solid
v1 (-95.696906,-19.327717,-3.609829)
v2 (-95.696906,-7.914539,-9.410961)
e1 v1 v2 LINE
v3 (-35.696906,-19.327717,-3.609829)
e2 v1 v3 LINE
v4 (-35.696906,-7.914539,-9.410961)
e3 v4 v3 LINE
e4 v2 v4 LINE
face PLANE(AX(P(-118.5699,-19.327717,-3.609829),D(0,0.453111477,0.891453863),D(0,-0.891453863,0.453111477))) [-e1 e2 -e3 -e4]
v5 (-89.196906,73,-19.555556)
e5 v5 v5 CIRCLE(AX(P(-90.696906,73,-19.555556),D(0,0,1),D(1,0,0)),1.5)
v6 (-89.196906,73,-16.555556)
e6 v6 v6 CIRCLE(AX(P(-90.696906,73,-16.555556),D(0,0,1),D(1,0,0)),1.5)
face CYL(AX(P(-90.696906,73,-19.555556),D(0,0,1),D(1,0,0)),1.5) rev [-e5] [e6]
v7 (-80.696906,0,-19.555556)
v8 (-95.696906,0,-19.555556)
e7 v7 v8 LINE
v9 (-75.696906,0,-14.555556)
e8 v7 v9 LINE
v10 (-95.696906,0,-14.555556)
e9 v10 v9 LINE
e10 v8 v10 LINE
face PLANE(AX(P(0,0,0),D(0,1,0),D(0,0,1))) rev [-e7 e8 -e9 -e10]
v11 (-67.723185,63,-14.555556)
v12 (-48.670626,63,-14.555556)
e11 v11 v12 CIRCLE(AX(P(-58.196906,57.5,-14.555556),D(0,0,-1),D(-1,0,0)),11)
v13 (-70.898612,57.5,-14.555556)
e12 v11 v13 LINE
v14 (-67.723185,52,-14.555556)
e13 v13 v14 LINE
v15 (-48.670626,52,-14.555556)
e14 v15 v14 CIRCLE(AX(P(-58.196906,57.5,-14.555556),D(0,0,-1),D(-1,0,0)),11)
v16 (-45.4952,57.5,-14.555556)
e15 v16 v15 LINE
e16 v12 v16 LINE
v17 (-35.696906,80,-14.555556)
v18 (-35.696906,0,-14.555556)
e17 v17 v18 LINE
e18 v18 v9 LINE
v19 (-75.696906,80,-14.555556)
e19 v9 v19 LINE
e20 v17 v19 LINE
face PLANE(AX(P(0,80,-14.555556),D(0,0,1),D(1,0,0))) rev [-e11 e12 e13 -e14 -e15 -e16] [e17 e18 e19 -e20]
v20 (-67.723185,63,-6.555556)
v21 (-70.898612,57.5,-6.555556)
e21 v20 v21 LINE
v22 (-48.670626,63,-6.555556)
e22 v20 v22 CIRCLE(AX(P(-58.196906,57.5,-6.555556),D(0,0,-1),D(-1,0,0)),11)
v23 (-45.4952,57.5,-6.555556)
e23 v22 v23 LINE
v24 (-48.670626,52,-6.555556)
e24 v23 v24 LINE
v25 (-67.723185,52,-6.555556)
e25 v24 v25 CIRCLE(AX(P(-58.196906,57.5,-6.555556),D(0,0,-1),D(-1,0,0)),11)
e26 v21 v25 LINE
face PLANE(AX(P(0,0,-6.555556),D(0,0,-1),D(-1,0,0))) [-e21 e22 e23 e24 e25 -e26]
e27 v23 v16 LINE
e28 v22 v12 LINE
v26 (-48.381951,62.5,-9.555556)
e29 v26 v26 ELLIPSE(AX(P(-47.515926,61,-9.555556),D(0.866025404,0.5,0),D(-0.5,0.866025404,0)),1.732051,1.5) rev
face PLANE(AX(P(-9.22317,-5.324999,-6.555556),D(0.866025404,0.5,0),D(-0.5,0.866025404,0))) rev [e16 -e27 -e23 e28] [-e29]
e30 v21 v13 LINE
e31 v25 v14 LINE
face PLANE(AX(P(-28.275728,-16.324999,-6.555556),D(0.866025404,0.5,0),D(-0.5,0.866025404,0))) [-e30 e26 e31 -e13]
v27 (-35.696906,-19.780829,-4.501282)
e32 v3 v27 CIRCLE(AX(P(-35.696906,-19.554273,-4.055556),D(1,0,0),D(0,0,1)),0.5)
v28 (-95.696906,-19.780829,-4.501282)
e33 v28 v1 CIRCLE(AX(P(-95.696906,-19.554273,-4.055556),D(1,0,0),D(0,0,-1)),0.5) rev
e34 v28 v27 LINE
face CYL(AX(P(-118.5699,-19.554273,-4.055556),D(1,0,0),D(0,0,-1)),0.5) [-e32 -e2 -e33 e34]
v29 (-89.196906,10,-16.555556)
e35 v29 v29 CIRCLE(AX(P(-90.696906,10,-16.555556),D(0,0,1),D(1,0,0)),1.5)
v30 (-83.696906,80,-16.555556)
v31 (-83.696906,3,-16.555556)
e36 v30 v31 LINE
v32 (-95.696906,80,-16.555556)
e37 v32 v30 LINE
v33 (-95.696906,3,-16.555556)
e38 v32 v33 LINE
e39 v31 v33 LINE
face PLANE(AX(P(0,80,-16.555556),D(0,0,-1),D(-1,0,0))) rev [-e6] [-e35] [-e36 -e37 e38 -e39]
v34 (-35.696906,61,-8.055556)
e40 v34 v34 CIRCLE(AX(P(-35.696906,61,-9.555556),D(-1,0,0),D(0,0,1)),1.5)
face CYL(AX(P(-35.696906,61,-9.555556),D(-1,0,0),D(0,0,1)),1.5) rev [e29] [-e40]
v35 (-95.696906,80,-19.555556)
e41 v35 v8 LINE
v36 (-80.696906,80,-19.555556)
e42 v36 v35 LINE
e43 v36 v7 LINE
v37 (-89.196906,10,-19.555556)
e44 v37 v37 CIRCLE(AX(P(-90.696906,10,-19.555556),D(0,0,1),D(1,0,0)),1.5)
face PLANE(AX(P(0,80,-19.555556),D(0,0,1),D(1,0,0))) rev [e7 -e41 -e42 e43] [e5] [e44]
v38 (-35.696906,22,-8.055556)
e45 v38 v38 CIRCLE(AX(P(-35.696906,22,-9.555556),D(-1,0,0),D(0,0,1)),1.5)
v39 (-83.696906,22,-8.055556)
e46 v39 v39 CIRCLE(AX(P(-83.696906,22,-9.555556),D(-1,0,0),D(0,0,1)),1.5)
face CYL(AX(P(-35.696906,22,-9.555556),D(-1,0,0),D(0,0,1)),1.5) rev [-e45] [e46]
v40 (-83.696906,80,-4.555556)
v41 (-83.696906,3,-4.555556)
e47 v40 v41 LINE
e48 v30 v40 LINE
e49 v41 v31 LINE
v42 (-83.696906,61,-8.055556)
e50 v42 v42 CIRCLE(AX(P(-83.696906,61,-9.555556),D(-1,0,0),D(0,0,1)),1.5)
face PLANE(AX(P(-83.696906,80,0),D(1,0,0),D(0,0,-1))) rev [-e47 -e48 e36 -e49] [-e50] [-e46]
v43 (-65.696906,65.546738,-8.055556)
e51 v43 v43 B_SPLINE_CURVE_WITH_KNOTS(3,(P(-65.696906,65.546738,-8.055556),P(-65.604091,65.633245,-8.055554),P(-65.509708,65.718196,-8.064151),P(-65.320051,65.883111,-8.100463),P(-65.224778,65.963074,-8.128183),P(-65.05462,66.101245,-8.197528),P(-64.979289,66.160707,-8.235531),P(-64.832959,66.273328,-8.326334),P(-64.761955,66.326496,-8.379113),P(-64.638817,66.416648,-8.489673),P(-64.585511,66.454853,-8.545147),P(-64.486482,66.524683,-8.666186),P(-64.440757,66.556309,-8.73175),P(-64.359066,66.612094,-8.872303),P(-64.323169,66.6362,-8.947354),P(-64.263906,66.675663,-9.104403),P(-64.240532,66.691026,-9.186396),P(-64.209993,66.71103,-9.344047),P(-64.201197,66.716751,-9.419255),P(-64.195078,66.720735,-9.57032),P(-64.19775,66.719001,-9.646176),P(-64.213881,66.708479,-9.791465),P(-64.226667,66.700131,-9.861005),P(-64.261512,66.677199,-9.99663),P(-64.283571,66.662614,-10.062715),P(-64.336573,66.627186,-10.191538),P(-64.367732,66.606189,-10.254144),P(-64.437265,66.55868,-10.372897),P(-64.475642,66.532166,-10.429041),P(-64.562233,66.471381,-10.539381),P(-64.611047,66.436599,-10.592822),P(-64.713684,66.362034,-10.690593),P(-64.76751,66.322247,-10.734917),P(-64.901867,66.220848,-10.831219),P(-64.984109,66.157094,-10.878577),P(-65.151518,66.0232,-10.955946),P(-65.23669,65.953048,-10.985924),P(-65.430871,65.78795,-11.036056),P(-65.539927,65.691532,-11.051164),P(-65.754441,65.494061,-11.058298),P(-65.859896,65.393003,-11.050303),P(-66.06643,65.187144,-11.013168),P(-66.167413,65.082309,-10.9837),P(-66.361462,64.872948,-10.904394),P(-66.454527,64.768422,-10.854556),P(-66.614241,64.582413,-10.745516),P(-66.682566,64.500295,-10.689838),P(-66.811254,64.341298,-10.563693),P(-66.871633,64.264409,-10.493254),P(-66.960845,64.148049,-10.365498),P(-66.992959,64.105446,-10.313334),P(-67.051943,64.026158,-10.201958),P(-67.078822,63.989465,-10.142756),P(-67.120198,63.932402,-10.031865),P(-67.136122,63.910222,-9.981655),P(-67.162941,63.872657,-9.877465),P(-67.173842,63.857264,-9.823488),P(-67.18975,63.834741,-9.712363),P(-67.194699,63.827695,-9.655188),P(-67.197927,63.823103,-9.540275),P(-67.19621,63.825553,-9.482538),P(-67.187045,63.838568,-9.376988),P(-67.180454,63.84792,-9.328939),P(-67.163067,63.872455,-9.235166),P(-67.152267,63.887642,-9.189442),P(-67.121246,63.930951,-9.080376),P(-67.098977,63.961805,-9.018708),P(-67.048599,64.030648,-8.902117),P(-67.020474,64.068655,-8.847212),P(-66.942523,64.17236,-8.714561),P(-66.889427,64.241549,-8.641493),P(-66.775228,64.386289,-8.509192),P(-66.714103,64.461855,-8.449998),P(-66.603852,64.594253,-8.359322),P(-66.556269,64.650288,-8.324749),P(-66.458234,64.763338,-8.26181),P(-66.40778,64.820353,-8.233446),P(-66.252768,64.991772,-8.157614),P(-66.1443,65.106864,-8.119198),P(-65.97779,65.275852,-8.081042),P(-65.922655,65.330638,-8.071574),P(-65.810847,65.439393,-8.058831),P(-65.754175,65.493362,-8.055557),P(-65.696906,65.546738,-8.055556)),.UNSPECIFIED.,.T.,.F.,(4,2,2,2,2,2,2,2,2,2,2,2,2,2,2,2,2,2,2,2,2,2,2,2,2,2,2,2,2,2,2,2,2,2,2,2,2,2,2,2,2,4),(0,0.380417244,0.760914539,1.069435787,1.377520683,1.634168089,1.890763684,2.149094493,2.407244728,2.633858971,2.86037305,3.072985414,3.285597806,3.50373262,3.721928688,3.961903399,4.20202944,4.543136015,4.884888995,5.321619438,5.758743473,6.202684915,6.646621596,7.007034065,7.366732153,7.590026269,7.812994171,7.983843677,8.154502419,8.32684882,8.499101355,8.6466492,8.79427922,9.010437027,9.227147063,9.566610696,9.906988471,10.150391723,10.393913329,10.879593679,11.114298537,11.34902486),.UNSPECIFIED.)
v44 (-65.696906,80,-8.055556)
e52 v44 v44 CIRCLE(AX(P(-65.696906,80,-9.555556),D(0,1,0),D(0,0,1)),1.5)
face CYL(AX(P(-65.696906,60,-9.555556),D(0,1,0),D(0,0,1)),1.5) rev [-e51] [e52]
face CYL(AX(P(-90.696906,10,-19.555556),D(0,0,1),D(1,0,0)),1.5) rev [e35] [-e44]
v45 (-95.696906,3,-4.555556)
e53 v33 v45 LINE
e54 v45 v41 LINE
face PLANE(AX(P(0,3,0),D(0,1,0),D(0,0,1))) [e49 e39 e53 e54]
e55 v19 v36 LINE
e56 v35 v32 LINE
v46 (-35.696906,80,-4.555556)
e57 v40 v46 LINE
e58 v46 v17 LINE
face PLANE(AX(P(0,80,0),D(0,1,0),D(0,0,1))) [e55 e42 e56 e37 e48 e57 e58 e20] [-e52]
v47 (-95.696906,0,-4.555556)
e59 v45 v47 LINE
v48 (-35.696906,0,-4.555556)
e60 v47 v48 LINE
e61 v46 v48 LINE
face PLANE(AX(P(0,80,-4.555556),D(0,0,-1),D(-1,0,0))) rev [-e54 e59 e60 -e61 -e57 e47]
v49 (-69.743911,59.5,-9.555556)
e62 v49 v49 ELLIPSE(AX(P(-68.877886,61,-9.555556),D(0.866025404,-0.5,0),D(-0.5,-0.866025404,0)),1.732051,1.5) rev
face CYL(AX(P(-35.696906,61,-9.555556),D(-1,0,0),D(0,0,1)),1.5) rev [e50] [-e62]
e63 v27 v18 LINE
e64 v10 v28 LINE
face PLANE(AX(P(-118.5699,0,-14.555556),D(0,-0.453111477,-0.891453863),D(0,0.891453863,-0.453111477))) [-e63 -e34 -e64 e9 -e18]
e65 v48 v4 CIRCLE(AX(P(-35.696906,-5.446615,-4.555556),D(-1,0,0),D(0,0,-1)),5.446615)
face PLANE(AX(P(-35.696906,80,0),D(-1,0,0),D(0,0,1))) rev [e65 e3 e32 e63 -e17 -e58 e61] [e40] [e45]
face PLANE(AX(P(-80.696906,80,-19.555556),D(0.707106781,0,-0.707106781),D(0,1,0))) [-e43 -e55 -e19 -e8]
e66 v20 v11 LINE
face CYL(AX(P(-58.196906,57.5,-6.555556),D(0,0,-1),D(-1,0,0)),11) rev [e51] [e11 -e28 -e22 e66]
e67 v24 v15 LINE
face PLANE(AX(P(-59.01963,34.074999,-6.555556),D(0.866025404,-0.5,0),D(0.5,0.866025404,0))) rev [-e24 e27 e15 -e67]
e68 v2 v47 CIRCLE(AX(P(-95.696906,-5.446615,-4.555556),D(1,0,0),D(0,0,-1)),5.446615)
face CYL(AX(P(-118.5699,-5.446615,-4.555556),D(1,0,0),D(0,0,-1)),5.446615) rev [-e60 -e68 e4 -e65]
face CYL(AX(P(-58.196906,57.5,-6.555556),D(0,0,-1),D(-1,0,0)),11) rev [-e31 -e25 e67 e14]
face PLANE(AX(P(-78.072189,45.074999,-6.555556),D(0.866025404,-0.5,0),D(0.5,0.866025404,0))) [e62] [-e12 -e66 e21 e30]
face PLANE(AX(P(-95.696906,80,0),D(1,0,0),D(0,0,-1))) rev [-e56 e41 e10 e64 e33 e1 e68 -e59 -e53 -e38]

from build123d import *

# Parameters (mm, degrees)
BOSS_EXTRUDE1_DEPTH = 80
SKETCH2_3_W         = 12
SKETCH2_3_H         = 12
BOSS_EXTRUDE2_DEPTH = 3
SKETCH4_R           = 1.5
CUT_EXTRUDE1_DEPTH  = 96.322713731
SKETCH5_R           = 1.5
CUT_EXTRUDE2_DEPTH  = 126.307213604
CUT_EXTRUDE3_DEPTH  = 8
SKETCH7_R           = 1.5
CUT_EXTRUDE5_DEPTH  = 20
BOSS_EXTRUDE3_START = -60
BOSS_EXTRUDE3_DEPTH = 60
CHAMFER1_SIZE       = 5


with BuildPart() as part:
    # Sketch2 → Boss-Extrude1 (new body)
    with BuildSketch(Plane(origin=(0, 0, 0), x_dir=(1, 0, 0), z_dir=(0, 1, 0))):
        Polygon((-80.696905807, 19.555555556), (-95.696905807, 19.555555556), (-95.696905807, 16.555555556), (-83.696905807, 16.555555556), (-83.696905807, 4.555555556), (-35.696905807, 4.555555556), (-35.696905807, 14.555555556), (-80.696905807, 14.555555556), align=None)
    extrude(amount=BOSS_EXTRUDE1_DEPTH)

    # Sketch2<3> → Boss-Extrude2 (add)
    with BuildSketch(Plane(origin=(0, 0, 0), x_dir=(1, 0, 0), z_dir=(0, 1, 0))):
        with Locations((-89.696905807, 10.555555556)):
            Rectangle(SKETCH2_3_W, SKETCH2_3_H)
    extrude(amount=BOSS_EXTRUDE2_DEPTH)

    # Sketch4 → Cut-Extrude1 (cut, through all)
    with BuildSketch(Plane.ZY.offset(83.696905807)):
        with Locations((-9.555555556, 22)):
            Circle(SKETCH4_R)
        with Locations((-9.555555556, 61)):
            Circle(SKETCH4_R)
    extrude(amount=-CUT_EXTRUDE1_DEPTH, mode=Mode.SUBTRACT)

    # Sketch5 → Cut-Extrude2 (cut, through all)
    with BuildSketch(Plane.XY.offset(-16.555555556)):
        with Locations((-90.696905807, 10)):
            Circle(SKETCH5_R)
        with Locations((-90.696905807, 73)):
            Circle(SKETCH5_R)
    extrude(amount=-CUT_EXTRUDE2_DEPTH, mode=Mode.SUBTRACT)

    # Sketch6 → Cut-Extrude3 (cut)
    with BuildSketch(Plane(origin=(0, 0, -14.555555556), x_dir=(-1, 0, 0), z_dir=(0, 0, -1))):
        with BuildLine():
            Line((67.723185249, 52), (70.89861173, 57.5))
            Line((70.89861173, 57.5), (67.723185249, 63))
            ThreePointArc((67.723185249, 63), (58.196905807, 68.5), (48.670626366, 63))
            Line((48.670626366, 63), (45.495199885, 57.5))
            Line((45.495199885, 57.5), (48.670626366, 52))
            ThreePointArc((48.670626366, 52), (58.196905807, 46.5), (67.723185249, 52))
        make_face()
    extrude(amount=-CUT_EXTRUDE3_DEPTH, mode=Mode.SUBTRACT)

    # Sketch7 → Cut-Extrude5 (cut)
    with BuildSketch(Plane(origin=(0, 80, 0), x_dir=(1, 0, 0), z_dir=(0, 1, 0))):
        with Locations(Location((-65.696905807, 9.555555556, 0), (0, 0, 270))):
            Circle(SKETCH7_R)
    extrude(amount=-CUT_EXTRUDE5_DEPTH, mode=Mode.SUBTRACT)

    # Sketch8 → Boss-Extrude3 (add)
    with BuildSketch(Plane(origin=(-35.696905807, 0, 0), x_dir=(0, 0, -1), z_dir=(1, 0, 0)).offset(BOSS_EXTRUDE3_START)):
        with BuildLine():
            Line((14.555555556, 0), (4.501282487, -19.780828807))
            ThreePointArc((4.501282487, -19.780828807), (3.828999817, -20), (3.609828624, -19.32771733))
            Line((3.609828624, -19.32771733), (9.410961448, -7.914538626))
            ThreePointArc((9.410961448, -7.914538626), (9.198154182, -2.598476584), (4.555555556, 0))
            Line((4.555555556, 0), (14.555555556, 0))
        make_face()
    extrude(amount=BOSS_EXTRUDE3_DEPTH)

    # Chamfer1
    chamfer1_edges = [part.edges().sort_by_distance(p)[0] for p in [
        (-80.696905807, 40, -14.555555556),
    ]]
    chamfer(chamfer1_edges, length=CHAMFER1_SIZE - 0.0001)  # a hair under: the kernel refuses the full size


solid = part.part
